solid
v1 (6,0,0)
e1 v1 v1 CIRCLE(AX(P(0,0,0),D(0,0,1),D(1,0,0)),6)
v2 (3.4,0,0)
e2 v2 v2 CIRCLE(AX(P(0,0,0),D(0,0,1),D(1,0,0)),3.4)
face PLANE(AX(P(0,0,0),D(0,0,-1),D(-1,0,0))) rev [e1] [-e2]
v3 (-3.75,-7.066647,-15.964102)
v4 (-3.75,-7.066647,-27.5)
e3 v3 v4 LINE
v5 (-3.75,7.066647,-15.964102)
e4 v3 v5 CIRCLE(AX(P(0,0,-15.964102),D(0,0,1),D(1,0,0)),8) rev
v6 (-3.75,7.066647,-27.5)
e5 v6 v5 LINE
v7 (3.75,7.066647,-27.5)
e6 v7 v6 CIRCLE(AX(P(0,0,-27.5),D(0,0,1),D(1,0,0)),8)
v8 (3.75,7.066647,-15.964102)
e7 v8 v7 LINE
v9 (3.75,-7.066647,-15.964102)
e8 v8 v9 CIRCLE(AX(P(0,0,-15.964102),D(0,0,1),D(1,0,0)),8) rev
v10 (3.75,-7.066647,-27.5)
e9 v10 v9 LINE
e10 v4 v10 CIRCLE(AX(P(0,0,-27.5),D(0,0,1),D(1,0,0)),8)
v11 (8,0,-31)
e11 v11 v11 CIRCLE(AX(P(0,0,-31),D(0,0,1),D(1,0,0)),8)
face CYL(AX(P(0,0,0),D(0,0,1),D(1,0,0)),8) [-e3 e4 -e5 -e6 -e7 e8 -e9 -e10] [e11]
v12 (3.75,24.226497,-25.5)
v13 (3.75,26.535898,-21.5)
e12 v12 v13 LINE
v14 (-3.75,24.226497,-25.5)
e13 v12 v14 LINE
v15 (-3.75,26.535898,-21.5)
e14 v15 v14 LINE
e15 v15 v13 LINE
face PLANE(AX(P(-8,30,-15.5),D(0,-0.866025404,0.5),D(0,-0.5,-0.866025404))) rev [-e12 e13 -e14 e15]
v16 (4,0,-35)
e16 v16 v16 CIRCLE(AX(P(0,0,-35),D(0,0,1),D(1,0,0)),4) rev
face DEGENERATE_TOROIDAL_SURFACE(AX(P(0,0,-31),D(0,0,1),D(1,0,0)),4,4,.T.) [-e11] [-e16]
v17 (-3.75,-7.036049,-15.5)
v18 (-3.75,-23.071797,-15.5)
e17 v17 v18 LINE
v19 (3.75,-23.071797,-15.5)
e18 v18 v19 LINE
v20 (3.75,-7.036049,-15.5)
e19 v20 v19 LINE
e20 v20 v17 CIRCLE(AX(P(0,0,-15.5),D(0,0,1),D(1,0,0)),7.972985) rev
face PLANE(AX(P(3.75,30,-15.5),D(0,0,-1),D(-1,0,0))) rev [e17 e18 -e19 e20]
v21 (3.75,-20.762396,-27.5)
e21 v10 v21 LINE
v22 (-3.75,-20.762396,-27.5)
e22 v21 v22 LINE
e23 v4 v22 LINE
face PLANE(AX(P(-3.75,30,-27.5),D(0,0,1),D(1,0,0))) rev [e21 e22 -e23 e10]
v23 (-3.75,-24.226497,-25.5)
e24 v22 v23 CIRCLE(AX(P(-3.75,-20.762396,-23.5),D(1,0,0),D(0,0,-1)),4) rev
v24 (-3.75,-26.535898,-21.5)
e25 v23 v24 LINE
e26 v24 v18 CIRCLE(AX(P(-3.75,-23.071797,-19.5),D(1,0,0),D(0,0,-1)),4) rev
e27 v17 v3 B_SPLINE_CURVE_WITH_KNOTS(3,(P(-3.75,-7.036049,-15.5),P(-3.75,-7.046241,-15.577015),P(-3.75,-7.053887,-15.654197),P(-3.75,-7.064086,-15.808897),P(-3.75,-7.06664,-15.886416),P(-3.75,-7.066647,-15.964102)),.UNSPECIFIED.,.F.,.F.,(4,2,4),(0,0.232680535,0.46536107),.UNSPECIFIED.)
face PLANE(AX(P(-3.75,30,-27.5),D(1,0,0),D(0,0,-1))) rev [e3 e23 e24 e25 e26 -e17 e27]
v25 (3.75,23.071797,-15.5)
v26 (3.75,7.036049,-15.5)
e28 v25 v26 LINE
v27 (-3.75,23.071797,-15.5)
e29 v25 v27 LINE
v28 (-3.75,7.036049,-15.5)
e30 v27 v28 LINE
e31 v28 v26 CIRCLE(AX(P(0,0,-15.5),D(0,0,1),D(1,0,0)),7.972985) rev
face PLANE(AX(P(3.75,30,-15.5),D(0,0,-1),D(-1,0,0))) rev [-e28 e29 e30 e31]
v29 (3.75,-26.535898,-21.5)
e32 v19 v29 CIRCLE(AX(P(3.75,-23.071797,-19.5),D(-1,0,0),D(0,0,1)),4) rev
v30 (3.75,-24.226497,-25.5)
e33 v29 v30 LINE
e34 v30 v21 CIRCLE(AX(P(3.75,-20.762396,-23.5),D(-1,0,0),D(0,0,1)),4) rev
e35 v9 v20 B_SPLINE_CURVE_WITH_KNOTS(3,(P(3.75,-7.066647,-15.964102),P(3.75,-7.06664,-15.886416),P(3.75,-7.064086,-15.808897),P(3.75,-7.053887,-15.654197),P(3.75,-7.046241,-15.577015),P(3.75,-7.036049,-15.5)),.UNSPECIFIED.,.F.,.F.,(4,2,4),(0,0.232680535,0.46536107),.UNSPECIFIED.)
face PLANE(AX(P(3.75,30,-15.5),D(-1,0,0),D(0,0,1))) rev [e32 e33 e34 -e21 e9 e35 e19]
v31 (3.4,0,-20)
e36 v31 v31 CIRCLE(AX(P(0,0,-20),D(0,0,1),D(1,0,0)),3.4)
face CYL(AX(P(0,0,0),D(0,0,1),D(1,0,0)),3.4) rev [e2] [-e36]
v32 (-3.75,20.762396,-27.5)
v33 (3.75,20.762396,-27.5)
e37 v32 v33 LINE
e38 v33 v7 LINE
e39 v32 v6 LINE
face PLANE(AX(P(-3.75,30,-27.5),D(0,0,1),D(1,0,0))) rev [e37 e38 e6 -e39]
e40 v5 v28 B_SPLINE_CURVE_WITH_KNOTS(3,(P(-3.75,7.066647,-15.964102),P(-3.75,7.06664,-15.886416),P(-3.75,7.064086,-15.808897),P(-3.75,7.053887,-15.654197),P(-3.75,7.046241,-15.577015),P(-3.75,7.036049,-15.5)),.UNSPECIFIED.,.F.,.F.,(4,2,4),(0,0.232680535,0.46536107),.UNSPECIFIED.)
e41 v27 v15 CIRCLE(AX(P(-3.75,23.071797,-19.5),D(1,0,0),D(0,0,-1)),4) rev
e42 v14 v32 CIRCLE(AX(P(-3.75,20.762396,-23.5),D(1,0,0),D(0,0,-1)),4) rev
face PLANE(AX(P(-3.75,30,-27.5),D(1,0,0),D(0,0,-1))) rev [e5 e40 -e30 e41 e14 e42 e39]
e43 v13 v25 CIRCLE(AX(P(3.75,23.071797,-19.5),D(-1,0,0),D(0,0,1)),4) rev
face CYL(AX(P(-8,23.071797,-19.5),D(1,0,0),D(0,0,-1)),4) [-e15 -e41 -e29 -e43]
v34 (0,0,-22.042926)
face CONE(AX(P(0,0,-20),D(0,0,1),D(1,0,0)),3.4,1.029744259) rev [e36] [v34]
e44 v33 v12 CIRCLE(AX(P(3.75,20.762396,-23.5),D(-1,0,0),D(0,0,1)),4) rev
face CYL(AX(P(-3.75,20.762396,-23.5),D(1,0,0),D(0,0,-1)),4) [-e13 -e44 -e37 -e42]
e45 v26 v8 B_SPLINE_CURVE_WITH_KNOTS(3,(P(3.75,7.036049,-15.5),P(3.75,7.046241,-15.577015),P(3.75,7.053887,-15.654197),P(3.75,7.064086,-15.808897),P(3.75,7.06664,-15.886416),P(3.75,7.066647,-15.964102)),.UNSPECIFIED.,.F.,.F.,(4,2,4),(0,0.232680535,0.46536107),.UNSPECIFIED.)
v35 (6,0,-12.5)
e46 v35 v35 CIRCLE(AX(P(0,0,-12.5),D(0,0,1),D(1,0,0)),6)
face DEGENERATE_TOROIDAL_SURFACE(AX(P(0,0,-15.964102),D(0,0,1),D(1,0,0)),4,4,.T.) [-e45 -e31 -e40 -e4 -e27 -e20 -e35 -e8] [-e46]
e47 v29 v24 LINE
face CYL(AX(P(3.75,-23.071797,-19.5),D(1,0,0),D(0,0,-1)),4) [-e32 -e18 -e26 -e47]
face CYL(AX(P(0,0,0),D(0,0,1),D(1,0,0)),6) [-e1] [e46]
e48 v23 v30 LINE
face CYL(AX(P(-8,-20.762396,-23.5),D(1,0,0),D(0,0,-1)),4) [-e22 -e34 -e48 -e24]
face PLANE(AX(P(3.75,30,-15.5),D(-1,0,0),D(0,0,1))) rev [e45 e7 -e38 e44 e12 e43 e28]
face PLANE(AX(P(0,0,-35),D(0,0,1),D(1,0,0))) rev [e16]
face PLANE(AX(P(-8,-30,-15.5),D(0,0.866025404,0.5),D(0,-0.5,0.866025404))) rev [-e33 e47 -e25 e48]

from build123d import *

# Parameters (mm, degrees)
SKETCH4_W               = 7.5
SKETCH4_H               = 12
BOSS_EXTRUDE2_DEPTH     = 30
CUT_EXTRUDE1_DEPTH      = 48.571656477
CUT_EXTRUDE1_DEPTH_BACK = 48.571656477
CUT_EXTRUDE2_DEPTH      = 48.571656477
CUT_EXTRUDE2_DEPTH_BACK = 48.571656477
M8_TAPPED_HOLE2_D       = 6.8
M8_TAPPED_HOLE2_DEPTH   = 20
M8_TAPPED_HOLE2_TIP     = 2.042926105
FILLET1_R               = 4
FILLET2_R               = 4


with BuildPart() as part:
    # Sketch2 → Revolve1 (revolve)
    with BuildSketch(Plane(origin=(0, 0, 0), x_dir=(1, 0, 0), z_dir=(0, 1, 0)), mode=Mode.PRIVATE) as revolve1_sk:
        Polygon((-6, 0), (0, 0), (0, 35), (-8, 35), (-8, 27.5), (-8, 15.5), (-8, 12.5), (-6, 12.5), align=None)
    revolve(revolve1_sk.sketch.rotate(Axis((0, 0, 0), (0, 0, -1)), 180), axis=Axis((0, 0, 0), (0, 0, -1)))

    # Sketch4 → Boss-Extrude2 (add, symmetric)
    with BuildSketch(Plane(origin=(0, 0, 0), x_dir=(1, 0, 0), z_dir=(0, 1, 0))):
        with Locations((0, 21.5)):
            Rectangle(SKETCH4_W, SKETCH4_H)
    extrude(amount=BOSS_EXTRUDE2_DEPTH, both=True)

    # Sketch5 → Cut-Extrude1 (cut, two sides: drawn at the far end of the back side and taken through both)
    with BuildSketch(Plane(origin=(3.75, 0, 0), x_dir=(0, 0, -1), z_dir=(1, 0, 0)).offset(-CUT_EXTRUDE1_DEPTH_BACK)):
        Polygon((15.5, 30), (27.5, 23.07179677), (27.5, 30), align=None)
    extrude(amount=CUT_EXTRUDE1_DEPTH + CUT_EXTRUDE1_DEPTH_BACK, mode=Mode.SUBTRACT)

    # Sketch6 → Cut-Extrude2 (cut, two sides: drawn at the far end of the back side and taken through both)
    with BuildSketch(Plane(origin=(3.75, 0, 0), x_dir=(0, 0, -1), z_dir=(1, 0, 0)).offset(-CUT_EXTRUDE2_DEPTH_BACK)):
        Polygon((15.5, -30), (27.5, -23.07179677), (27.5, -30), align=None)
    extrude(amount=CUT_EXTRUDE2_DEPTH + CUT_EXTRUDE2_DEPTH_BACK, mode=Mode.SUBTRACT)

    # M8 Tapped Hole2
    with Locations(Plane.XY):
        with Locations((0, 0)):
            Hole(M8_TAPPED_HOLE2_D / 2, depth=M8_TAPPED_HOLE2_DEPTH)
            with Locations((0, 0, -(M8_TAPPED_HOLE2_DEPTH + M8_TAPPED_HOLE2_TIP / 2))):  # 118° drill point
                Cone(0, M8_TAPPED_HOLE2_D / 2, M8_TAPPED_HOLE2_TIP, mode=Mode.SUBTRACT)

    # Fillet1
    fillet1_edges = [part.edges().sort_by_distance(p)[0] for p in [
        (0, -30, -15.5),
        (0, 30, -15.5),
        (0, 23.07179677, -27.5),
        (0, -23.07179677, -27.5),
    ]]
    fillet(fillet1_edges, radius=FILLET1_R)

    # Fillet2
    # the kernel refuses this fillet: 4 mm, written as the material it takes off along each edge
    with BuildSketch(Plane(origin=(0, 0, -35), x_dir=(1, 0, 0), z_dir=(0, 1, 0))) as fillet2_piece_1:
        with BuildLine():
            CenterArc((8 - FILLET2_R, -FILLET2_R), FILLET2_R, 0, 90)
            Line((8 - FILLET2_R, 0), (8, 0))
            Line((8, 0), (8, -FILLET2_R))
        make_face()
    revolve(axis=Axis((0, 0, -35), (0, 0, -1)), mode=Mode.SUBTRACT)
    with BuildSketch(Plane(origin=(0, 0, -12.5), x_dir=(1, 0, 0), z_dir=(0, 1, 0))) as fillet2_piece_2_section:
        with BuildLine():
            CenterArc((4, 3.464101615), FILLET2_R, 300, 60)
            Line((6, 0), (8, 0))
            Line((8, 0), (8, 3.464101615))
        make_face()
    fillet2_piece_2 = revolve(axis=Axis((0, 0, -12.5), (0, 0, -1)), mode=Mode.PRIVATE)
    fillet2_piece_2 = split(fillet2_piece_2, bisect_by=Plane(origin=(3.75, -4.120033491, -15.73161152), z_dir=(1, 0, 0)), keep=Keep.TOP, mode=Mode.PRIVATE)
    add(fillet2_piece_2, mode=Mode.SUBTRACT)
    with BuildSketch(Plane(origin=(0, 0, -12.5), x_dir=(1, 0, 0), z_dir=(0, 1, 0))) as fillet2_piece_3_section:
        with BuildLine():
            CenterArc((4, 3.464101615), FILLET2_R, 300, 60)
            Line((6, 0), (8, 0))
            Line((8, 0), (8, 3.464101615))
        make_face()
    fillet2_piece_3 = revolve(axis=Axis((0, 0, -12.5), (0, 0, -1)), mode=Mode.PRIVATE)
    fillet2_piece_3 = split(fillet2_piece_3, bisect_by=Plane(origin=(0, -7.348709995, -15.5), z_dir=(0, 0, 1)), keep=Keep.TOP, mode=Mode.PRIVATE)
    add(fillet2_piece_3, mode=Mode.SUBTRACT)
    with BuildSketch(Plane(origin=(0, 0, -12.5), x_dir=(1, 0, 0), z_dir=(0, 1, 0))) as fillet2_piece_4_section:
        with BuildLine():
            CenterArc((4, 3.464101615), FILLET2_R, 300, 60)
            Line((6, 0), (8, 0))
            Line((8, 0), (8, 3.464101615))
        make_face()
    fillet2_piece_4 = revolve(axis=Axis((0, 0, -12.5), (0, 0, -1)), mode=Mode.PRIVATE)
    fillet2_piece_4 = split(fillet2_piece_4, bisect_by=Plane(origin=(-3.75, 0, -15.73161152), z_dir=(-1, 0, 0)), keep=Keep.TOP, mode=Mode.PRIVATE)
    add(fillet2_piece_4, mode=Mode.SUBTRACT)


solid = part.part
